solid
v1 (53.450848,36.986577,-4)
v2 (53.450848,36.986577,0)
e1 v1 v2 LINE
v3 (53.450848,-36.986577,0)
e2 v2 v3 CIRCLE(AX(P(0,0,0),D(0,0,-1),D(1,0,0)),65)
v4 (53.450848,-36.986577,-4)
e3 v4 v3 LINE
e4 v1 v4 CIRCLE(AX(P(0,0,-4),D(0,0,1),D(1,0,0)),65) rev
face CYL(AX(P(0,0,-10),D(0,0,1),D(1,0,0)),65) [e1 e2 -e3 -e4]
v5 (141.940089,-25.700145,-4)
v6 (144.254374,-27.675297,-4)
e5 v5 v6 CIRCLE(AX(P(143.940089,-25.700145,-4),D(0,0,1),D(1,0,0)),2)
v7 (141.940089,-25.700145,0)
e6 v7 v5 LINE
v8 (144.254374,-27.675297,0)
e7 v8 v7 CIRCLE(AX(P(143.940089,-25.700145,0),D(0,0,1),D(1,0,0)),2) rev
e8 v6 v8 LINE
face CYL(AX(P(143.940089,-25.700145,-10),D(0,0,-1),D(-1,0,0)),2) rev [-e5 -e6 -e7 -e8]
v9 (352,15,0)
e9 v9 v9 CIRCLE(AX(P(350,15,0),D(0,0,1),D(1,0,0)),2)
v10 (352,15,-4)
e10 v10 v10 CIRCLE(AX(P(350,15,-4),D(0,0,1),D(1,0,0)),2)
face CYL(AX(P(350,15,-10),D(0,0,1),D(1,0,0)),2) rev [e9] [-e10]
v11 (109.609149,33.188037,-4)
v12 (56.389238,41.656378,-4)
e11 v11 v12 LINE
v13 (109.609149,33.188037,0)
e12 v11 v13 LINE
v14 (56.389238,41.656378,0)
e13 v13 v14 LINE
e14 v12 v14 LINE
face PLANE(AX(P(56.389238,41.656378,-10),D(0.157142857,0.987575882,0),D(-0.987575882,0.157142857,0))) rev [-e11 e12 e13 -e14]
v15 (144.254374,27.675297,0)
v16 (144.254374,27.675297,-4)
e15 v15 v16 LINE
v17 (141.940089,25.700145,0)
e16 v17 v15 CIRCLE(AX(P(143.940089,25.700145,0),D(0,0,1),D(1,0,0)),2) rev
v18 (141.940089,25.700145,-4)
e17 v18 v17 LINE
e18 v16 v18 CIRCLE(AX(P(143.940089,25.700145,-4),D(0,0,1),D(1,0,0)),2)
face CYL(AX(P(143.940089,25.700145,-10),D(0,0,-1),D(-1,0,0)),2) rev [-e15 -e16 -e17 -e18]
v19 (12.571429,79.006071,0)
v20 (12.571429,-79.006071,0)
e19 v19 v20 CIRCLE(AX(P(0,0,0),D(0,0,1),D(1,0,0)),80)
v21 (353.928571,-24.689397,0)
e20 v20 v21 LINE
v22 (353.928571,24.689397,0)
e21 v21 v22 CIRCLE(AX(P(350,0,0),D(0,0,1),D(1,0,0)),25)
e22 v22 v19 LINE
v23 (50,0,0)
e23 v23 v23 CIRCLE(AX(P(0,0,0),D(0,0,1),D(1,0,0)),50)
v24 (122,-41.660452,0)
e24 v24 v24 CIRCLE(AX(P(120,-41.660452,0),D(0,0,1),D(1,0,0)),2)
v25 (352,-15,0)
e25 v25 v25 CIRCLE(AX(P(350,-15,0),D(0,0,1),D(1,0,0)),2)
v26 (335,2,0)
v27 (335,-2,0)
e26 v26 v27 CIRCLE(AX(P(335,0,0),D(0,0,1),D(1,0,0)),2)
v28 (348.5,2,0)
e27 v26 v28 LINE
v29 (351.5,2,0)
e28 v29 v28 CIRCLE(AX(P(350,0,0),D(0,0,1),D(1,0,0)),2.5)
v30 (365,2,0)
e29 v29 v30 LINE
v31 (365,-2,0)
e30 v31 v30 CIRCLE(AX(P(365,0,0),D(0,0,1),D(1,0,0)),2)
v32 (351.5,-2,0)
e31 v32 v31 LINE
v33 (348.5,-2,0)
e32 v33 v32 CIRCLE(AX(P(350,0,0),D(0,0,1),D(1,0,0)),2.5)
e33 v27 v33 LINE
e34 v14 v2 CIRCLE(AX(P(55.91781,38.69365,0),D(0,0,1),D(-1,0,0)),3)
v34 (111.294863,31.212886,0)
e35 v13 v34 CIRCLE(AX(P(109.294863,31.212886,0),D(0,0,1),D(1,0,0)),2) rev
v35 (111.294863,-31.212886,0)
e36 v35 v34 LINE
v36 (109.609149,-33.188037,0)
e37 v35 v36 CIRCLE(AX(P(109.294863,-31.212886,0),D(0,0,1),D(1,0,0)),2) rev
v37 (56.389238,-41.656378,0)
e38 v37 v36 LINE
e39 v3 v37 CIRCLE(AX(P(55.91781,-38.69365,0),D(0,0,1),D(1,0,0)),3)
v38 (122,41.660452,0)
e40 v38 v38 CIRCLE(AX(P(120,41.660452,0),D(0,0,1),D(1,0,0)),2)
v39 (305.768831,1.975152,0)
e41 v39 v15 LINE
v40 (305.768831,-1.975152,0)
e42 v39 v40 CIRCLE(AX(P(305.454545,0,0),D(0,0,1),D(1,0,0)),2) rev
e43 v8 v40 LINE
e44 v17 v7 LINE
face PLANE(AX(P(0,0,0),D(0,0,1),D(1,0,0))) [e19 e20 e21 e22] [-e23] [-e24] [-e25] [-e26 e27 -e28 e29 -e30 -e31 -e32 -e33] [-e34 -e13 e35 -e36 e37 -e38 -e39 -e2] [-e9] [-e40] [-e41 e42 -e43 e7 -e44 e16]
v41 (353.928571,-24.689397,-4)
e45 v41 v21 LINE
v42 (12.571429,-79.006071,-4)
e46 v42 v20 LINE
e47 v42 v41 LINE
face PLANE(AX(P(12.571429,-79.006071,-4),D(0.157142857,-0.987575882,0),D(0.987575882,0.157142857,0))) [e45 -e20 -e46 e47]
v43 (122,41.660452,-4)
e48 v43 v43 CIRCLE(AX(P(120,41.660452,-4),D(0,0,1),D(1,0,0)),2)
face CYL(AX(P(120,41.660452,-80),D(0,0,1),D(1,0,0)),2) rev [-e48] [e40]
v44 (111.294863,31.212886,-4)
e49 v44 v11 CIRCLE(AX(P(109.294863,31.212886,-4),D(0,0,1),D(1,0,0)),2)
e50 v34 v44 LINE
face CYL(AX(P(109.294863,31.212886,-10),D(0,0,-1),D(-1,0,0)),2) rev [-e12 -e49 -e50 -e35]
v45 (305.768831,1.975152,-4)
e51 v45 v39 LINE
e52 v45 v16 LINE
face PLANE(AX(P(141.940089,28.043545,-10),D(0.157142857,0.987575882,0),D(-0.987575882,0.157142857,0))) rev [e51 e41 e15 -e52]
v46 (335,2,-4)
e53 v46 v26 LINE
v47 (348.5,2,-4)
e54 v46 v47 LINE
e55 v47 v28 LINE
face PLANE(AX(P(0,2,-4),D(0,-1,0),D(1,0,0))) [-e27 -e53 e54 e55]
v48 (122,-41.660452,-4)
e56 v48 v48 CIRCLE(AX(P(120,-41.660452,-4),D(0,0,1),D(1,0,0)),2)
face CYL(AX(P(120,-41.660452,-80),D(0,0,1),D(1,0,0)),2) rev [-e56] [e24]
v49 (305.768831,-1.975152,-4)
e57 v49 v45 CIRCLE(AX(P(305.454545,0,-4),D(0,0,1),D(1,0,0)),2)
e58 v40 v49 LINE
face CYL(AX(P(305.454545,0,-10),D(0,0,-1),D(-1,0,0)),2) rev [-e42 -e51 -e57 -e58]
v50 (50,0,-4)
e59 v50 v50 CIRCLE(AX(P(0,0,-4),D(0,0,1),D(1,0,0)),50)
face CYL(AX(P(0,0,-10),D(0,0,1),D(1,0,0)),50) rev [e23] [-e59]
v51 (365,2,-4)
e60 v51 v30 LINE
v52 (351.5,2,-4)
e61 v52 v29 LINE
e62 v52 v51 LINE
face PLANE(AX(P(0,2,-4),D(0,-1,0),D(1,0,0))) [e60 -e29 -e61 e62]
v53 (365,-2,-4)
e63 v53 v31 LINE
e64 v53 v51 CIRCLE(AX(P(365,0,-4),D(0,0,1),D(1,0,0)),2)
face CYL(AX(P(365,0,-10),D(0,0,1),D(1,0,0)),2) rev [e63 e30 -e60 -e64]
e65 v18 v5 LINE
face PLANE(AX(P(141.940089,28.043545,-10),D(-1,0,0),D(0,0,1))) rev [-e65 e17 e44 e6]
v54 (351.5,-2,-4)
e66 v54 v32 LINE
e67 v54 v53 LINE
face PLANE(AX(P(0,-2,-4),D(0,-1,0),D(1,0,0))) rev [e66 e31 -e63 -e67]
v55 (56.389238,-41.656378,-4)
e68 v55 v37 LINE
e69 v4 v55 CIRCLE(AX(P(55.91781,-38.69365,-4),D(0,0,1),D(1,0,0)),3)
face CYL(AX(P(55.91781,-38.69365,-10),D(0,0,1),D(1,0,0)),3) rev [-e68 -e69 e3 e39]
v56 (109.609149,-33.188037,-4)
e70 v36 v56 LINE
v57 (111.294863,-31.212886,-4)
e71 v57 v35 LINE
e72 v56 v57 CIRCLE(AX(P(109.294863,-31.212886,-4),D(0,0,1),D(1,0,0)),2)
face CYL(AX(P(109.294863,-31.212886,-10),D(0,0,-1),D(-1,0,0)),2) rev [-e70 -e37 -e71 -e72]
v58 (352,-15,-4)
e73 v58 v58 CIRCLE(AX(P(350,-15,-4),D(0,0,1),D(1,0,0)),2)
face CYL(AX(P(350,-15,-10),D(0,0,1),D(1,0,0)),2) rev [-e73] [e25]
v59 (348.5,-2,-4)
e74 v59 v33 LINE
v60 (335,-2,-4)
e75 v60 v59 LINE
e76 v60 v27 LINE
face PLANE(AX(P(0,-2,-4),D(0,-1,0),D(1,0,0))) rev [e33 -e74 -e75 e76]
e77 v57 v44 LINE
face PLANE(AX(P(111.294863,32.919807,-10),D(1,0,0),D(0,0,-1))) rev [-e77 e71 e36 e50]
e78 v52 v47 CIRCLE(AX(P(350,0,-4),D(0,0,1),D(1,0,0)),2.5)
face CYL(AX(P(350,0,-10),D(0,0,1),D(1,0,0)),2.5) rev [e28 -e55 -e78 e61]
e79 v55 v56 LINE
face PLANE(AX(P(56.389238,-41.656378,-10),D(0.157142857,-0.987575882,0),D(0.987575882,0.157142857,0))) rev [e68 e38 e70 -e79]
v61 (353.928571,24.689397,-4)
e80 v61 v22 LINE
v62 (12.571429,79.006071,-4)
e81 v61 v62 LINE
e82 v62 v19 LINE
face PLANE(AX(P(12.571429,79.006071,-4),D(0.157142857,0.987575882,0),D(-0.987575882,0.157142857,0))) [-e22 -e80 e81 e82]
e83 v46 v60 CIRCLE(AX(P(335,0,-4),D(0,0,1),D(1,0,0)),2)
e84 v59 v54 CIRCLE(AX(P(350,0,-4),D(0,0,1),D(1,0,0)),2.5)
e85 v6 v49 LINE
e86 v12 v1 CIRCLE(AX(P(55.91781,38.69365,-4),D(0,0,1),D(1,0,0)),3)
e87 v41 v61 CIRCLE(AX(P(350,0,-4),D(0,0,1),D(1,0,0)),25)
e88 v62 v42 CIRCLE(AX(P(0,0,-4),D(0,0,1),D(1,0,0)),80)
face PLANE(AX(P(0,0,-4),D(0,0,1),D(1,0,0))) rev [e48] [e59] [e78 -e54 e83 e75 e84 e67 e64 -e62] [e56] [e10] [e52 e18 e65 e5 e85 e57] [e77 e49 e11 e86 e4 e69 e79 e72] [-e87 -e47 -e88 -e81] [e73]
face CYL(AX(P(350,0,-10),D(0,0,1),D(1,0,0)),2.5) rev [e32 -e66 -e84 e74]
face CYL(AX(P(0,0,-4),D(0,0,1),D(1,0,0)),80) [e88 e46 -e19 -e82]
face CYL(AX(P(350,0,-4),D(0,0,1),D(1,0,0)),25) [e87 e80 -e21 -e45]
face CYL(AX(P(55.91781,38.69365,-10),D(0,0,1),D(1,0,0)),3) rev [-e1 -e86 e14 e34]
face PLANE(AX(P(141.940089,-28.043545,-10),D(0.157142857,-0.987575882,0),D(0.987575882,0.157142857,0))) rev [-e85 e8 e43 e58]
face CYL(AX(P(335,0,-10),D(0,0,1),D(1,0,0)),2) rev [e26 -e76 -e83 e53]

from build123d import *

# Parameters (mm, degrees)
SM_BASE_FLANGE_1_DEPTH = 4
SKETCH_6_R             = 20
SKETCH_6_R_2           = 2.5
CUT_EXTRUDE_1_DEPTH    = 10
SKETCH_7_R             = 2
CUT_EXTRUDE_2_DEPTH    = 10
CUT_EXTRUDE_3_DEPTH    = 10
SKETCH_9_R             = 2
CUT_EXTRUDE_4_DEPTH    = 80
FILLET_2_R             = 2
SKETCH_10_R            = 50
CUT_EXTRUDE_5_DEPTH    = 10


# Sheet-metal steps are written as plain solids
with BuildPart() as part:
    # Sketch 1 → 基体-法兰1 (new body)
    with BuildSketch(Plane.XY):
        with BuildLine():
            Line((12.571428571, 79.00607055), (353.928571429, 24.689397047))
            ThreePointArc((353.928571429, 24.689397047), (375, 0), (353.928571429, -24.689397047))
            Line((353.928571429, -24.689397047), (12.571428571, -79.00607055))
            ThreePointArc((12.571428571, -79.00607055), (-80, 0), (12.571428571, 79.00607055))
        make_face()
    extrude(amount=-SM_BASE_FLANGE_1_DEPTH)

    # 草图6 → 切除-拉伸1 (cut)
    with BuildSketch(Plane.XY):
        Circle(SKETCH_6_R)
        with Locations((350, 0)):
            Circle(SKETCH_6_R_2)
    extrude(amount=-CUT_EXTRUDE_1_DEPTH, mode=Mode.SUBTRACT)

    # 草图7 → 切除-拉伸2 (cut)
    with BuildSketch(Plane.XY):
        with Locations((365, 0)):
            Circle(SKETCH_7_R)
        with Locations((350, -15)):
            Circle(SKETCH_7_R)
        with Locations((335, 0)):
            Circle(SKETCH_7_R)
        with Locations((350, 15)):
            Circle(SKETCH_7_R)
        with BuildLine():
            Line((111.294862901, 32.919806827), (111.294862901, -32.919806827))
            Line((111.294862901, -32.919806827), (56.389238276, -41.656377743))
            ThreePointArc((56.389238276, -41.656377743), (53.378656764, -40.291367953), (53.450847511, -36.986577299))
            ThreePointArc((53.450847511, -36.986577299), (62.032293151, -19.416348946), (64.999939097, -0.088979461))
            ThreePointArc((64.999939097, -0.088979461), (62.058814357, 19.33141383), (53.450847511, 36.986577299))
            ThreePointArc((53.450847511, 36.986577299), (53.378656764, 40.291367953), (56.389238276, 41.656377743))
            Line((56.389238276, 41.656377743), (111.294862901, 32.919806827))
        make_face()
        Polygon((141.940088648, 28.043545246), (141.940088648, -28.043545246), (318.181818182, 0), align=None)
    extrude(amount=-CUT_EXTRUDE_2_DEPTH, mode=Mode.SUBTRACT)

    # 草图8 → 切除-拉伸3 (cut)
    with BuildSketch(Plane.XY):
        with BuildLine():
            Line((347.5, 0), (337, 0))
            ThreePointArc((337, 0), (336.414213562, -1.414213562), (335, -2))
            Line((335, -2), (348.5, -2))
            ThreePointArc((348.5, -2), (347.763932023, -1.118033989), (347.5, 0))
        make_face()
        with BuildLine():
            ThreePointArc((335, 2), (336.414213562, 1.414213562), (337, 0))
            Line((337, 0), (347.5, 0))
            ThreePointArc((347.5, 0), (347.763932023, 1.118033989), (348.5, 2))
            Line((348.5, 2), (335, 2))
        make_face()
        with BuildLine():
            ThreePointArc((351.5, 2), (352.236067977, 1.118033989), (352.5, 0))
            Line((352.5, 0), (363, 0))
            ThreePointArc((363, 0), (363.585786438, 1.414213562), (365, 2))
            Line((365, 2), (351.5, 2))
        make_face()
        with BuildLine():
            Line((363, 0), (352.5, 0))
            ThreePointArc((352.5, 0), (352.236067977, -1.118033989), (351.5, -2))
            Line((351.5, -2), (365, -2))
            ThreePointArc((365, -2), (363.585786438, -1.414213562), (363, 0))
        make_face()
    extrude(amount=-CUT_EXTRUDE_3_DEPTH, mode=Mode.SUBTRACT)

    # 草图9 → 切除-拉伸4 (cut)
    with BuildSketch(Plane.XY):
        with Locations((120, 41.660451514)):
            Circle(SKETCH_9_R)
        with Locations((120, -41.660451514)):
            Circle(SKETCH_9_R)
    extrude(amount=-CUT_EXTRUDE_4_DEPTH, mode=Mode.SUBTRACT)

    # 圆角2
    fillet_2_edges = [part.edges().sort_by_distance(p)[0] for p in [
        (141.940088648, 28.043545246, -2),
        (318.181818182, 0, -2),
        (141.940088648, -28.043545246, -2),
        (111.294862901, 32.919806827, -2),
        (111.294862901, -32.919806827, -2),
    ]]
    fillet(fillet_2_edges, radius=FILLET_2_R)

    # 草图10 → 切除-拉伸5 (cut)
    with BuildSketch(Plane.XY):
        Circle(SKETCH_10_R)
    extrude(amount=-CUT_EXTRUDE_5_DEPTH, mode=Mode.SUBTRACT)


solid = part.part
